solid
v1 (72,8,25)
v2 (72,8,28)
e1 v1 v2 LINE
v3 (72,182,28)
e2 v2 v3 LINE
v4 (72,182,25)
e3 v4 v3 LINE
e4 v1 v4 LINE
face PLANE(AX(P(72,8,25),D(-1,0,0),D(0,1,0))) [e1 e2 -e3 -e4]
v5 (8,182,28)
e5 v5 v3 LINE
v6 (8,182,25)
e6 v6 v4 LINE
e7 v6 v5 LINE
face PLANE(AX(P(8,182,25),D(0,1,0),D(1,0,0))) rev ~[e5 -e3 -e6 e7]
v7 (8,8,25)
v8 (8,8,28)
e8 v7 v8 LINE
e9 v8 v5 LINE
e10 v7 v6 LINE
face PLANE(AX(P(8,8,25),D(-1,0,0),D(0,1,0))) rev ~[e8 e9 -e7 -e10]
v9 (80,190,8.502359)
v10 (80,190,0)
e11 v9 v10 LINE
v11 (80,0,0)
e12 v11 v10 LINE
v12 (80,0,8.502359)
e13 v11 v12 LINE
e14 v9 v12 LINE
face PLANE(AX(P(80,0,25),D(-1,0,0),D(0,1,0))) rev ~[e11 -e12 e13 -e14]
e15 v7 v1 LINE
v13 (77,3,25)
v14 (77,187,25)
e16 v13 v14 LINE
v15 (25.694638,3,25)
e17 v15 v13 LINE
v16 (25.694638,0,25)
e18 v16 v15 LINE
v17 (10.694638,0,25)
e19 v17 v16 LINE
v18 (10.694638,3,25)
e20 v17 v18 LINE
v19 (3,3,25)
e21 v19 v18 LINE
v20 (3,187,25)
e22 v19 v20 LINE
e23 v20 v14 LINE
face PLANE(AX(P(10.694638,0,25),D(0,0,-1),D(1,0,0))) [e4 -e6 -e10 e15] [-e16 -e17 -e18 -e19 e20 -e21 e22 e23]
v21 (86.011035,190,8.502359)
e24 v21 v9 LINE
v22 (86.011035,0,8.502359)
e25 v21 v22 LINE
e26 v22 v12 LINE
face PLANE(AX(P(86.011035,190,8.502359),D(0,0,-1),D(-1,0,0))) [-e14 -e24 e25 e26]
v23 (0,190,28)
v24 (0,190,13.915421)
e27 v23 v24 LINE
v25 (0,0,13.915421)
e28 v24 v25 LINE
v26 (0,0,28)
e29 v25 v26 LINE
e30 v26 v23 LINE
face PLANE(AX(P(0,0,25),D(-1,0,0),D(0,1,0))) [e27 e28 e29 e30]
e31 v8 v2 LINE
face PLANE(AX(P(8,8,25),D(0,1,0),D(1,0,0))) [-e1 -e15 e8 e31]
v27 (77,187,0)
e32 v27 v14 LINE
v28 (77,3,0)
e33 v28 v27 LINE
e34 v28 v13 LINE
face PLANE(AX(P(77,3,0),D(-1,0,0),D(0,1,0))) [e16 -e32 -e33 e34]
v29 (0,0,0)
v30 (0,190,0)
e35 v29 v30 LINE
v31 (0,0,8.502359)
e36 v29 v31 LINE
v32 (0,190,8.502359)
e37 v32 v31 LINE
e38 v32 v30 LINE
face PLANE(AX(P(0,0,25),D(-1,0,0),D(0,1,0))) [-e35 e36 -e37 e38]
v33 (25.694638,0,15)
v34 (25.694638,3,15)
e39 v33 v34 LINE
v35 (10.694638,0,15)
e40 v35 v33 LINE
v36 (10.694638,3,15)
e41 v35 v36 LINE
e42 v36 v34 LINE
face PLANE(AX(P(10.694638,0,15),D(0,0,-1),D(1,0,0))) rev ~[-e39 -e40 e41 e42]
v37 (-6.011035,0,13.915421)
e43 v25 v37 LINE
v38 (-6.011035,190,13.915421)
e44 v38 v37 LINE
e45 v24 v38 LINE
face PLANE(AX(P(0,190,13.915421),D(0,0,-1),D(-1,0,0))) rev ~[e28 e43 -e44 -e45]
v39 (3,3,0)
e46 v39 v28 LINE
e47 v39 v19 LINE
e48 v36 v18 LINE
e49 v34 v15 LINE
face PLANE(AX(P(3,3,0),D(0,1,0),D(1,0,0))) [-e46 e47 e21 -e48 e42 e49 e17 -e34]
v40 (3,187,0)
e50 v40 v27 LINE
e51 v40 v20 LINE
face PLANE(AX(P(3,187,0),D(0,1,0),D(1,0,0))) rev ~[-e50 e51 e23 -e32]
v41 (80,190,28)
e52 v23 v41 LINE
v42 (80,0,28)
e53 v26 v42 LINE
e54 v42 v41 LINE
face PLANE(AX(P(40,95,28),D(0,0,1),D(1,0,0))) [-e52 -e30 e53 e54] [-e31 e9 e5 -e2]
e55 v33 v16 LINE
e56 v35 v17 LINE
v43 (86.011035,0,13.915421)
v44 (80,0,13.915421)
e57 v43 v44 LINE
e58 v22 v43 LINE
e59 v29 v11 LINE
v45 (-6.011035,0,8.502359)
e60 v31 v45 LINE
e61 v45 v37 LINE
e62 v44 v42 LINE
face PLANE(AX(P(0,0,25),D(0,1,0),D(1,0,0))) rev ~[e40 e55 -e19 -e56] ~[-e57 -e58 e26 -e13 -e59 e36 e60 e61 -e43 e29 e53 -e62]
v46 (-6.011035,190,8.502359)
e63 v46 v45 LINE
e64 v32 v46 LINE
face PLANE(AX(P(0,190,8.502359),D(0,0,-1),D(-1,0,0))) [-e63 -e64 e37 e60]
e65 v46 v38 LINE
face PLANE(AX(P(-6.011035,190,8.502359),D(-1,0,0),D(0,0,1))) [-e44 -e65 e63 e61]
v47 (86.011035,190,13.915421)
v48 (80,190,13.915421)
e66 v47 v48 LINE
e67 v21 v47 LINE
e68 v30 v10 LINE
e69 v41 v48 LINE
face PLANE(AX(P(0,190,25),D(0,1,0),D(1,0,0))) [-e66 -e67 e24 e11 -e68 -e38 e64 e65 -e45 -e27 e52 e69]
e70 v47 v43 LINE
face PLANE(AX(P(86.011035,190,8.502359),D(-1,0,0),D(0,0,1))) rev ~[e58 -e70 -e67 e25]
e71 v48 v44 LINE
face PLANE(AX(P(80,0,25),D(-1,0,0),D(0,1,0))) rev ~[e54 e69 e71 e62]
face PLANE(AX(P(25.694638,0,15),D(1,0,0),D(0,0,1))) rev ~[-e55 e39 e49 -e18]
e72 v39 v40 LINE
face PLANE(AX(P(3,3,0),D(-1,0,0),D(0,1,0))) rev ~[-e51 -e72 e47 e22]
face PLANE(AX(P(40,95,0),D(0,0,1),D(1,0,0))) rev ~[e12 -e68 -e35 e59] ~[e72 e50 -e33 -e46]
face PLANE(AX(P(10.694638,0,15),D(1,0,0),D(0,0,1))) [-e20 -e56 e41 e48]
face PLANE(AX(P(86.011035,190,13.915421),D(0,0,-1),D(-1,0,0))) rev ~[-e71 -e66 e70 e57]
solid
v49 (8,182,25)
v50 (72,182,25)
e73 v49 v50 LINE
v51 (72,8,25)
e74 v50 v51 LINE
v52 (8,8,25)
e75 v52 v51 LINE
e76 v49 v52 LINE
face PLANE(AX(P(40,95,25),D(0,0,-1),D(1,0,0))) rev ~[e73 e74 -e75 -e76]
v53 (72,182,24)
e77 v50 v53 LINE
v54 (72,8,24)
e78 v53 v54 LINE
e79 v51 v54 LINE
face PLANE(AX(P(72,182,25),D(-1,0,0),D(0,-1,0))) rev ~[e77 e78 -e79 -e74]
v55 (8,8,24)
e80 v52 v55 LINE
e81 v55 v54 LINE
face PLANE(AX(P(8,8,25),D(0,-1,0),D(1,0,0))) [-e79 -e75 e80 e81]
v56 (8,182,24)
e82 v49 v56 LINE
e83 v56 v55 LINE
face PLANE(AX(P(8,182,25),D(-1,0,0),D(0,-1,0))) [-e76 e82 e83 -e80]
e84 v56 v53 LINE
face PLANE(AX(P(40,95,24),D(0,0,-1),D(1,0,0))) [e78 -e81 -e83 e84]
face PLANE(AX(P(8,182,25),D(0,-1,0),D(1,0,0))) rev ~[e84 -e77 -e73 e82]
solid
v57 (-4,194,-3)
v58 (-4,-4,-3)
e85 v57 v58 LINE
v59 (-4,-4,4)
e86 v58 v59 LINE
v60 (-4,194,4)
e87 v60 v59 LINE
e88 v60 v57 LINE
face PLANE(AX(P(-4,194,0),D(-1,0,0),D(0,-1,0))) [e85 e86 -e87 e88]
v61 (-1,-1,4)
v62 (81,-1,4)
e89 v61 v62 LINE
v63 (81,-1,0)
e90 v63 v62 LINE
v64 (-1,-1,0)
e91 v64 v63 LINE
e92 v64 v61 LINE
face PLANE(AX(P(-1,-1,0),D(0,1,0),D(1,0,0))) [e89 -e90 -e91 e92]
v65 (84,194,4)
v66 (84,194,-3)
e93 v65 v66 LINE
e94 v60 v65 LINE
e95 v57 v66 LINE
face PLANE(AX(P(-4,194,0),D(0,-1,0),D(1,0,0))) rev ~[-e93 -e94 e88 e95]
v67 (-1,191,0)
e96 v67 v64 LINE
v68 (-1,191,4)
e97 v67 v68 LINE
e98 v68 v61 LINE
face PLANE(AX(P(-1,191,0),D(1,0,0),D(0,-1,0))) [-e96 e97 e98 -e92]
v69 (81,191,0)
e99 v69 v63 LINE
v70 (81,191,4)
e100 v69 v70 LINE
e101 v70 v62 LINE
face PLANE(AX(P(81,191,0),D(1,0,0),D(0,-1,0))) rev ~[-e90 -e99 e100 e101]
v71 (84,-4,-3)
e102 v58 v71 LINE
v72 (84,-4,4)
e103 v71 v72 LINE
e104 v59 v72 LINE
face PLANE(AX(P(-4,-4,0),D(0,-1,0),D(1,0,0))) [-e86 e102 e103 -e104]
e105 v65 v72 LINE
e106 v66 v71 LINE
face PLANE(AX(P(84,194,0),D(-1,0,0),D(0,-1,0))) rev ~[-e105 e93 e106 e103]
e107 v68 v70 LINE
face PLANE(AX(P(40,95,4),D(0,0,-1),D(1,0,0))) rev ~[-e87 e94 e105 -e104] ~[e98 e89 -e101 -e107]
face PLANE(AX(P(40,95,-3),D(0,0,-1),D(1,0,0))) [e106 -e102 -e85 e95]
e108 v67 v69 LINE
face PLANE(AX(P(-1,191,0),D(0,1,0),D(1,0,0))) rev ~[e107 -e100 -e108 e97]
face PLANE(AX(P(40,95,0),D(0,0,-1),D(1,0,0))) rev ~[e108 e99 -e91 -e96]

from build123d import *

# Parameters (mm, degrees)
F0_W      = 80
F0_H      = 190
F0_W_2    = 74
F0_H_2    = 184
F1_DEPTH  = 25
F2_W      = 80
F2_H      = 190
F2_W_2    = 64
F2_H_2    = 174
F3_DEPTH  = 3
F6_W      = 88
F6_H      = 198
F6_W_2    = 82
F6_H_2    = 192
F7_DEPTH  = 4
F6_W_3    = 80
F6_H_3    = 190
F6_W_4    = 74
F6_H_4    = 184
F8_DEPTH  = 3
F9_W      = 6.0110352933
F9_H      = 5.4130628705
F10_DEPTH = 190
F11_W     = 15
F11_H     = 10
F12_DEPTH = 3
F13_W     = 64
F13_H     = 174
F14_DEPTH = 1


# Not quite as in the source:
# - a feature names something its author has since deleted; it is built from what else it names


with BuildPart() as f1:
    # F0 (on Top) → F1 (new body)
    with BuildSketch(Plane.XY):
        with Locations((40, 95)):
            Rectangle(F0_W, F0_H)
        with Locations((40, 95)):
            Rectangle(F0_W_2, F0_H_2, mode=Mode.SUBTRACT)
    extrude(amount=F1_DEPTH)

    # F2 (on face) → F3 (join)
    with BuildSketch(Plane.XY.offset(25)):
        with Locations((40, 95)):
            Rectangle(F2_W, F2_H)
        with Locations((40, 95)):
            Rectangle(F2_W_2, F2_H_2, mode=Mode.SUBTRACT)
    extrude(amount=F3_DEPTH)

    # F9 (on face) → F10 (join, through all)
    with BuildSketch(Plane(origin=(0, 190, 0), x_dir=(-1, 0, 0), z_dir=(0, 1, 0))):
        with Locations((3.0055176467, 11.2088900059)):
            Rectangle(F9_W, F9_H)
        with Locations((-83.0055176467, 11.2088900059)):
            Rectangle(F9_W, F9_H)
    extrude(amount=-F10_DEPTH)

    # F11 (on face) → F12 (cut, through all)
    with BuildSketch(Plane.XZ):
        with Locations((18.1946381893, 20)):
            Rectangle(F11_W, F11_H)
    extrude(amount=-F12_DEPTH, mode=Mode.SUBTRACT)


with BuildPart() as f7:
    # F6 (on face) → F7 (new body)
    with BuildSketch(Plane(origin=(0, 0, 0), x_dir=(1, 0, 0), z_dir=(0, 0, -1))):
        with Locations((40, -95)):
            Rectangle(F6_W, F6_H)
        with Locations((40, -95)):
            Rectangle(F6_W_2, F6_H_2, mode=Mode.SUBTRACT)
    extrude(amount=-F7_DEPTH)

    # F6 (on face) → F8 (join)
    with BuildSketch(Plane(origin=(0, 0, 0), x_dir=(1, 0, 0), z_dir=(0, 0, -1))):
        with Locations((40, -95)):
            Rectangle(F6_W, F6_H)
        with Locations((40, -95)):
            Rectangle(F6_W_2, F6_H_2, mode=Mode.SUBTRACT)
        with Locations((40, -95)):
            Rectangle(F6_W_2, F6_H_2)
        with Locations((40, -95)):
            Rectangle(F6_W_3, F6_H_3, mode=Mode.SUBTRACT)
        with Locations((40, -95)):
            Rectangle(F6_W_3, F6_H_3)
        with Locations((40, -95)):
            Rectangle(F6_W_4, F6_H_4, mode=Mode.SUBTRACT)
        with Locations((40, -95)):
            Rectangle(F6_W_4, F6_H_4)
    extrude(amount=F8_DEPTH)


with BuildPart() as f14:
    # F13 (on face) → F14 (new body)
    with BuildSketch(Plane(origin=(0, 0, 25), x_dir=(1, 0, 0), z_dir=(0, 0, -1))):
        with Locations((40, -95)):
            Rectangle(F13_W, F13_H)
    extrude(amount=F14_DEPTH)


solid = Compound([f1.part, f7.part, f14.part])
